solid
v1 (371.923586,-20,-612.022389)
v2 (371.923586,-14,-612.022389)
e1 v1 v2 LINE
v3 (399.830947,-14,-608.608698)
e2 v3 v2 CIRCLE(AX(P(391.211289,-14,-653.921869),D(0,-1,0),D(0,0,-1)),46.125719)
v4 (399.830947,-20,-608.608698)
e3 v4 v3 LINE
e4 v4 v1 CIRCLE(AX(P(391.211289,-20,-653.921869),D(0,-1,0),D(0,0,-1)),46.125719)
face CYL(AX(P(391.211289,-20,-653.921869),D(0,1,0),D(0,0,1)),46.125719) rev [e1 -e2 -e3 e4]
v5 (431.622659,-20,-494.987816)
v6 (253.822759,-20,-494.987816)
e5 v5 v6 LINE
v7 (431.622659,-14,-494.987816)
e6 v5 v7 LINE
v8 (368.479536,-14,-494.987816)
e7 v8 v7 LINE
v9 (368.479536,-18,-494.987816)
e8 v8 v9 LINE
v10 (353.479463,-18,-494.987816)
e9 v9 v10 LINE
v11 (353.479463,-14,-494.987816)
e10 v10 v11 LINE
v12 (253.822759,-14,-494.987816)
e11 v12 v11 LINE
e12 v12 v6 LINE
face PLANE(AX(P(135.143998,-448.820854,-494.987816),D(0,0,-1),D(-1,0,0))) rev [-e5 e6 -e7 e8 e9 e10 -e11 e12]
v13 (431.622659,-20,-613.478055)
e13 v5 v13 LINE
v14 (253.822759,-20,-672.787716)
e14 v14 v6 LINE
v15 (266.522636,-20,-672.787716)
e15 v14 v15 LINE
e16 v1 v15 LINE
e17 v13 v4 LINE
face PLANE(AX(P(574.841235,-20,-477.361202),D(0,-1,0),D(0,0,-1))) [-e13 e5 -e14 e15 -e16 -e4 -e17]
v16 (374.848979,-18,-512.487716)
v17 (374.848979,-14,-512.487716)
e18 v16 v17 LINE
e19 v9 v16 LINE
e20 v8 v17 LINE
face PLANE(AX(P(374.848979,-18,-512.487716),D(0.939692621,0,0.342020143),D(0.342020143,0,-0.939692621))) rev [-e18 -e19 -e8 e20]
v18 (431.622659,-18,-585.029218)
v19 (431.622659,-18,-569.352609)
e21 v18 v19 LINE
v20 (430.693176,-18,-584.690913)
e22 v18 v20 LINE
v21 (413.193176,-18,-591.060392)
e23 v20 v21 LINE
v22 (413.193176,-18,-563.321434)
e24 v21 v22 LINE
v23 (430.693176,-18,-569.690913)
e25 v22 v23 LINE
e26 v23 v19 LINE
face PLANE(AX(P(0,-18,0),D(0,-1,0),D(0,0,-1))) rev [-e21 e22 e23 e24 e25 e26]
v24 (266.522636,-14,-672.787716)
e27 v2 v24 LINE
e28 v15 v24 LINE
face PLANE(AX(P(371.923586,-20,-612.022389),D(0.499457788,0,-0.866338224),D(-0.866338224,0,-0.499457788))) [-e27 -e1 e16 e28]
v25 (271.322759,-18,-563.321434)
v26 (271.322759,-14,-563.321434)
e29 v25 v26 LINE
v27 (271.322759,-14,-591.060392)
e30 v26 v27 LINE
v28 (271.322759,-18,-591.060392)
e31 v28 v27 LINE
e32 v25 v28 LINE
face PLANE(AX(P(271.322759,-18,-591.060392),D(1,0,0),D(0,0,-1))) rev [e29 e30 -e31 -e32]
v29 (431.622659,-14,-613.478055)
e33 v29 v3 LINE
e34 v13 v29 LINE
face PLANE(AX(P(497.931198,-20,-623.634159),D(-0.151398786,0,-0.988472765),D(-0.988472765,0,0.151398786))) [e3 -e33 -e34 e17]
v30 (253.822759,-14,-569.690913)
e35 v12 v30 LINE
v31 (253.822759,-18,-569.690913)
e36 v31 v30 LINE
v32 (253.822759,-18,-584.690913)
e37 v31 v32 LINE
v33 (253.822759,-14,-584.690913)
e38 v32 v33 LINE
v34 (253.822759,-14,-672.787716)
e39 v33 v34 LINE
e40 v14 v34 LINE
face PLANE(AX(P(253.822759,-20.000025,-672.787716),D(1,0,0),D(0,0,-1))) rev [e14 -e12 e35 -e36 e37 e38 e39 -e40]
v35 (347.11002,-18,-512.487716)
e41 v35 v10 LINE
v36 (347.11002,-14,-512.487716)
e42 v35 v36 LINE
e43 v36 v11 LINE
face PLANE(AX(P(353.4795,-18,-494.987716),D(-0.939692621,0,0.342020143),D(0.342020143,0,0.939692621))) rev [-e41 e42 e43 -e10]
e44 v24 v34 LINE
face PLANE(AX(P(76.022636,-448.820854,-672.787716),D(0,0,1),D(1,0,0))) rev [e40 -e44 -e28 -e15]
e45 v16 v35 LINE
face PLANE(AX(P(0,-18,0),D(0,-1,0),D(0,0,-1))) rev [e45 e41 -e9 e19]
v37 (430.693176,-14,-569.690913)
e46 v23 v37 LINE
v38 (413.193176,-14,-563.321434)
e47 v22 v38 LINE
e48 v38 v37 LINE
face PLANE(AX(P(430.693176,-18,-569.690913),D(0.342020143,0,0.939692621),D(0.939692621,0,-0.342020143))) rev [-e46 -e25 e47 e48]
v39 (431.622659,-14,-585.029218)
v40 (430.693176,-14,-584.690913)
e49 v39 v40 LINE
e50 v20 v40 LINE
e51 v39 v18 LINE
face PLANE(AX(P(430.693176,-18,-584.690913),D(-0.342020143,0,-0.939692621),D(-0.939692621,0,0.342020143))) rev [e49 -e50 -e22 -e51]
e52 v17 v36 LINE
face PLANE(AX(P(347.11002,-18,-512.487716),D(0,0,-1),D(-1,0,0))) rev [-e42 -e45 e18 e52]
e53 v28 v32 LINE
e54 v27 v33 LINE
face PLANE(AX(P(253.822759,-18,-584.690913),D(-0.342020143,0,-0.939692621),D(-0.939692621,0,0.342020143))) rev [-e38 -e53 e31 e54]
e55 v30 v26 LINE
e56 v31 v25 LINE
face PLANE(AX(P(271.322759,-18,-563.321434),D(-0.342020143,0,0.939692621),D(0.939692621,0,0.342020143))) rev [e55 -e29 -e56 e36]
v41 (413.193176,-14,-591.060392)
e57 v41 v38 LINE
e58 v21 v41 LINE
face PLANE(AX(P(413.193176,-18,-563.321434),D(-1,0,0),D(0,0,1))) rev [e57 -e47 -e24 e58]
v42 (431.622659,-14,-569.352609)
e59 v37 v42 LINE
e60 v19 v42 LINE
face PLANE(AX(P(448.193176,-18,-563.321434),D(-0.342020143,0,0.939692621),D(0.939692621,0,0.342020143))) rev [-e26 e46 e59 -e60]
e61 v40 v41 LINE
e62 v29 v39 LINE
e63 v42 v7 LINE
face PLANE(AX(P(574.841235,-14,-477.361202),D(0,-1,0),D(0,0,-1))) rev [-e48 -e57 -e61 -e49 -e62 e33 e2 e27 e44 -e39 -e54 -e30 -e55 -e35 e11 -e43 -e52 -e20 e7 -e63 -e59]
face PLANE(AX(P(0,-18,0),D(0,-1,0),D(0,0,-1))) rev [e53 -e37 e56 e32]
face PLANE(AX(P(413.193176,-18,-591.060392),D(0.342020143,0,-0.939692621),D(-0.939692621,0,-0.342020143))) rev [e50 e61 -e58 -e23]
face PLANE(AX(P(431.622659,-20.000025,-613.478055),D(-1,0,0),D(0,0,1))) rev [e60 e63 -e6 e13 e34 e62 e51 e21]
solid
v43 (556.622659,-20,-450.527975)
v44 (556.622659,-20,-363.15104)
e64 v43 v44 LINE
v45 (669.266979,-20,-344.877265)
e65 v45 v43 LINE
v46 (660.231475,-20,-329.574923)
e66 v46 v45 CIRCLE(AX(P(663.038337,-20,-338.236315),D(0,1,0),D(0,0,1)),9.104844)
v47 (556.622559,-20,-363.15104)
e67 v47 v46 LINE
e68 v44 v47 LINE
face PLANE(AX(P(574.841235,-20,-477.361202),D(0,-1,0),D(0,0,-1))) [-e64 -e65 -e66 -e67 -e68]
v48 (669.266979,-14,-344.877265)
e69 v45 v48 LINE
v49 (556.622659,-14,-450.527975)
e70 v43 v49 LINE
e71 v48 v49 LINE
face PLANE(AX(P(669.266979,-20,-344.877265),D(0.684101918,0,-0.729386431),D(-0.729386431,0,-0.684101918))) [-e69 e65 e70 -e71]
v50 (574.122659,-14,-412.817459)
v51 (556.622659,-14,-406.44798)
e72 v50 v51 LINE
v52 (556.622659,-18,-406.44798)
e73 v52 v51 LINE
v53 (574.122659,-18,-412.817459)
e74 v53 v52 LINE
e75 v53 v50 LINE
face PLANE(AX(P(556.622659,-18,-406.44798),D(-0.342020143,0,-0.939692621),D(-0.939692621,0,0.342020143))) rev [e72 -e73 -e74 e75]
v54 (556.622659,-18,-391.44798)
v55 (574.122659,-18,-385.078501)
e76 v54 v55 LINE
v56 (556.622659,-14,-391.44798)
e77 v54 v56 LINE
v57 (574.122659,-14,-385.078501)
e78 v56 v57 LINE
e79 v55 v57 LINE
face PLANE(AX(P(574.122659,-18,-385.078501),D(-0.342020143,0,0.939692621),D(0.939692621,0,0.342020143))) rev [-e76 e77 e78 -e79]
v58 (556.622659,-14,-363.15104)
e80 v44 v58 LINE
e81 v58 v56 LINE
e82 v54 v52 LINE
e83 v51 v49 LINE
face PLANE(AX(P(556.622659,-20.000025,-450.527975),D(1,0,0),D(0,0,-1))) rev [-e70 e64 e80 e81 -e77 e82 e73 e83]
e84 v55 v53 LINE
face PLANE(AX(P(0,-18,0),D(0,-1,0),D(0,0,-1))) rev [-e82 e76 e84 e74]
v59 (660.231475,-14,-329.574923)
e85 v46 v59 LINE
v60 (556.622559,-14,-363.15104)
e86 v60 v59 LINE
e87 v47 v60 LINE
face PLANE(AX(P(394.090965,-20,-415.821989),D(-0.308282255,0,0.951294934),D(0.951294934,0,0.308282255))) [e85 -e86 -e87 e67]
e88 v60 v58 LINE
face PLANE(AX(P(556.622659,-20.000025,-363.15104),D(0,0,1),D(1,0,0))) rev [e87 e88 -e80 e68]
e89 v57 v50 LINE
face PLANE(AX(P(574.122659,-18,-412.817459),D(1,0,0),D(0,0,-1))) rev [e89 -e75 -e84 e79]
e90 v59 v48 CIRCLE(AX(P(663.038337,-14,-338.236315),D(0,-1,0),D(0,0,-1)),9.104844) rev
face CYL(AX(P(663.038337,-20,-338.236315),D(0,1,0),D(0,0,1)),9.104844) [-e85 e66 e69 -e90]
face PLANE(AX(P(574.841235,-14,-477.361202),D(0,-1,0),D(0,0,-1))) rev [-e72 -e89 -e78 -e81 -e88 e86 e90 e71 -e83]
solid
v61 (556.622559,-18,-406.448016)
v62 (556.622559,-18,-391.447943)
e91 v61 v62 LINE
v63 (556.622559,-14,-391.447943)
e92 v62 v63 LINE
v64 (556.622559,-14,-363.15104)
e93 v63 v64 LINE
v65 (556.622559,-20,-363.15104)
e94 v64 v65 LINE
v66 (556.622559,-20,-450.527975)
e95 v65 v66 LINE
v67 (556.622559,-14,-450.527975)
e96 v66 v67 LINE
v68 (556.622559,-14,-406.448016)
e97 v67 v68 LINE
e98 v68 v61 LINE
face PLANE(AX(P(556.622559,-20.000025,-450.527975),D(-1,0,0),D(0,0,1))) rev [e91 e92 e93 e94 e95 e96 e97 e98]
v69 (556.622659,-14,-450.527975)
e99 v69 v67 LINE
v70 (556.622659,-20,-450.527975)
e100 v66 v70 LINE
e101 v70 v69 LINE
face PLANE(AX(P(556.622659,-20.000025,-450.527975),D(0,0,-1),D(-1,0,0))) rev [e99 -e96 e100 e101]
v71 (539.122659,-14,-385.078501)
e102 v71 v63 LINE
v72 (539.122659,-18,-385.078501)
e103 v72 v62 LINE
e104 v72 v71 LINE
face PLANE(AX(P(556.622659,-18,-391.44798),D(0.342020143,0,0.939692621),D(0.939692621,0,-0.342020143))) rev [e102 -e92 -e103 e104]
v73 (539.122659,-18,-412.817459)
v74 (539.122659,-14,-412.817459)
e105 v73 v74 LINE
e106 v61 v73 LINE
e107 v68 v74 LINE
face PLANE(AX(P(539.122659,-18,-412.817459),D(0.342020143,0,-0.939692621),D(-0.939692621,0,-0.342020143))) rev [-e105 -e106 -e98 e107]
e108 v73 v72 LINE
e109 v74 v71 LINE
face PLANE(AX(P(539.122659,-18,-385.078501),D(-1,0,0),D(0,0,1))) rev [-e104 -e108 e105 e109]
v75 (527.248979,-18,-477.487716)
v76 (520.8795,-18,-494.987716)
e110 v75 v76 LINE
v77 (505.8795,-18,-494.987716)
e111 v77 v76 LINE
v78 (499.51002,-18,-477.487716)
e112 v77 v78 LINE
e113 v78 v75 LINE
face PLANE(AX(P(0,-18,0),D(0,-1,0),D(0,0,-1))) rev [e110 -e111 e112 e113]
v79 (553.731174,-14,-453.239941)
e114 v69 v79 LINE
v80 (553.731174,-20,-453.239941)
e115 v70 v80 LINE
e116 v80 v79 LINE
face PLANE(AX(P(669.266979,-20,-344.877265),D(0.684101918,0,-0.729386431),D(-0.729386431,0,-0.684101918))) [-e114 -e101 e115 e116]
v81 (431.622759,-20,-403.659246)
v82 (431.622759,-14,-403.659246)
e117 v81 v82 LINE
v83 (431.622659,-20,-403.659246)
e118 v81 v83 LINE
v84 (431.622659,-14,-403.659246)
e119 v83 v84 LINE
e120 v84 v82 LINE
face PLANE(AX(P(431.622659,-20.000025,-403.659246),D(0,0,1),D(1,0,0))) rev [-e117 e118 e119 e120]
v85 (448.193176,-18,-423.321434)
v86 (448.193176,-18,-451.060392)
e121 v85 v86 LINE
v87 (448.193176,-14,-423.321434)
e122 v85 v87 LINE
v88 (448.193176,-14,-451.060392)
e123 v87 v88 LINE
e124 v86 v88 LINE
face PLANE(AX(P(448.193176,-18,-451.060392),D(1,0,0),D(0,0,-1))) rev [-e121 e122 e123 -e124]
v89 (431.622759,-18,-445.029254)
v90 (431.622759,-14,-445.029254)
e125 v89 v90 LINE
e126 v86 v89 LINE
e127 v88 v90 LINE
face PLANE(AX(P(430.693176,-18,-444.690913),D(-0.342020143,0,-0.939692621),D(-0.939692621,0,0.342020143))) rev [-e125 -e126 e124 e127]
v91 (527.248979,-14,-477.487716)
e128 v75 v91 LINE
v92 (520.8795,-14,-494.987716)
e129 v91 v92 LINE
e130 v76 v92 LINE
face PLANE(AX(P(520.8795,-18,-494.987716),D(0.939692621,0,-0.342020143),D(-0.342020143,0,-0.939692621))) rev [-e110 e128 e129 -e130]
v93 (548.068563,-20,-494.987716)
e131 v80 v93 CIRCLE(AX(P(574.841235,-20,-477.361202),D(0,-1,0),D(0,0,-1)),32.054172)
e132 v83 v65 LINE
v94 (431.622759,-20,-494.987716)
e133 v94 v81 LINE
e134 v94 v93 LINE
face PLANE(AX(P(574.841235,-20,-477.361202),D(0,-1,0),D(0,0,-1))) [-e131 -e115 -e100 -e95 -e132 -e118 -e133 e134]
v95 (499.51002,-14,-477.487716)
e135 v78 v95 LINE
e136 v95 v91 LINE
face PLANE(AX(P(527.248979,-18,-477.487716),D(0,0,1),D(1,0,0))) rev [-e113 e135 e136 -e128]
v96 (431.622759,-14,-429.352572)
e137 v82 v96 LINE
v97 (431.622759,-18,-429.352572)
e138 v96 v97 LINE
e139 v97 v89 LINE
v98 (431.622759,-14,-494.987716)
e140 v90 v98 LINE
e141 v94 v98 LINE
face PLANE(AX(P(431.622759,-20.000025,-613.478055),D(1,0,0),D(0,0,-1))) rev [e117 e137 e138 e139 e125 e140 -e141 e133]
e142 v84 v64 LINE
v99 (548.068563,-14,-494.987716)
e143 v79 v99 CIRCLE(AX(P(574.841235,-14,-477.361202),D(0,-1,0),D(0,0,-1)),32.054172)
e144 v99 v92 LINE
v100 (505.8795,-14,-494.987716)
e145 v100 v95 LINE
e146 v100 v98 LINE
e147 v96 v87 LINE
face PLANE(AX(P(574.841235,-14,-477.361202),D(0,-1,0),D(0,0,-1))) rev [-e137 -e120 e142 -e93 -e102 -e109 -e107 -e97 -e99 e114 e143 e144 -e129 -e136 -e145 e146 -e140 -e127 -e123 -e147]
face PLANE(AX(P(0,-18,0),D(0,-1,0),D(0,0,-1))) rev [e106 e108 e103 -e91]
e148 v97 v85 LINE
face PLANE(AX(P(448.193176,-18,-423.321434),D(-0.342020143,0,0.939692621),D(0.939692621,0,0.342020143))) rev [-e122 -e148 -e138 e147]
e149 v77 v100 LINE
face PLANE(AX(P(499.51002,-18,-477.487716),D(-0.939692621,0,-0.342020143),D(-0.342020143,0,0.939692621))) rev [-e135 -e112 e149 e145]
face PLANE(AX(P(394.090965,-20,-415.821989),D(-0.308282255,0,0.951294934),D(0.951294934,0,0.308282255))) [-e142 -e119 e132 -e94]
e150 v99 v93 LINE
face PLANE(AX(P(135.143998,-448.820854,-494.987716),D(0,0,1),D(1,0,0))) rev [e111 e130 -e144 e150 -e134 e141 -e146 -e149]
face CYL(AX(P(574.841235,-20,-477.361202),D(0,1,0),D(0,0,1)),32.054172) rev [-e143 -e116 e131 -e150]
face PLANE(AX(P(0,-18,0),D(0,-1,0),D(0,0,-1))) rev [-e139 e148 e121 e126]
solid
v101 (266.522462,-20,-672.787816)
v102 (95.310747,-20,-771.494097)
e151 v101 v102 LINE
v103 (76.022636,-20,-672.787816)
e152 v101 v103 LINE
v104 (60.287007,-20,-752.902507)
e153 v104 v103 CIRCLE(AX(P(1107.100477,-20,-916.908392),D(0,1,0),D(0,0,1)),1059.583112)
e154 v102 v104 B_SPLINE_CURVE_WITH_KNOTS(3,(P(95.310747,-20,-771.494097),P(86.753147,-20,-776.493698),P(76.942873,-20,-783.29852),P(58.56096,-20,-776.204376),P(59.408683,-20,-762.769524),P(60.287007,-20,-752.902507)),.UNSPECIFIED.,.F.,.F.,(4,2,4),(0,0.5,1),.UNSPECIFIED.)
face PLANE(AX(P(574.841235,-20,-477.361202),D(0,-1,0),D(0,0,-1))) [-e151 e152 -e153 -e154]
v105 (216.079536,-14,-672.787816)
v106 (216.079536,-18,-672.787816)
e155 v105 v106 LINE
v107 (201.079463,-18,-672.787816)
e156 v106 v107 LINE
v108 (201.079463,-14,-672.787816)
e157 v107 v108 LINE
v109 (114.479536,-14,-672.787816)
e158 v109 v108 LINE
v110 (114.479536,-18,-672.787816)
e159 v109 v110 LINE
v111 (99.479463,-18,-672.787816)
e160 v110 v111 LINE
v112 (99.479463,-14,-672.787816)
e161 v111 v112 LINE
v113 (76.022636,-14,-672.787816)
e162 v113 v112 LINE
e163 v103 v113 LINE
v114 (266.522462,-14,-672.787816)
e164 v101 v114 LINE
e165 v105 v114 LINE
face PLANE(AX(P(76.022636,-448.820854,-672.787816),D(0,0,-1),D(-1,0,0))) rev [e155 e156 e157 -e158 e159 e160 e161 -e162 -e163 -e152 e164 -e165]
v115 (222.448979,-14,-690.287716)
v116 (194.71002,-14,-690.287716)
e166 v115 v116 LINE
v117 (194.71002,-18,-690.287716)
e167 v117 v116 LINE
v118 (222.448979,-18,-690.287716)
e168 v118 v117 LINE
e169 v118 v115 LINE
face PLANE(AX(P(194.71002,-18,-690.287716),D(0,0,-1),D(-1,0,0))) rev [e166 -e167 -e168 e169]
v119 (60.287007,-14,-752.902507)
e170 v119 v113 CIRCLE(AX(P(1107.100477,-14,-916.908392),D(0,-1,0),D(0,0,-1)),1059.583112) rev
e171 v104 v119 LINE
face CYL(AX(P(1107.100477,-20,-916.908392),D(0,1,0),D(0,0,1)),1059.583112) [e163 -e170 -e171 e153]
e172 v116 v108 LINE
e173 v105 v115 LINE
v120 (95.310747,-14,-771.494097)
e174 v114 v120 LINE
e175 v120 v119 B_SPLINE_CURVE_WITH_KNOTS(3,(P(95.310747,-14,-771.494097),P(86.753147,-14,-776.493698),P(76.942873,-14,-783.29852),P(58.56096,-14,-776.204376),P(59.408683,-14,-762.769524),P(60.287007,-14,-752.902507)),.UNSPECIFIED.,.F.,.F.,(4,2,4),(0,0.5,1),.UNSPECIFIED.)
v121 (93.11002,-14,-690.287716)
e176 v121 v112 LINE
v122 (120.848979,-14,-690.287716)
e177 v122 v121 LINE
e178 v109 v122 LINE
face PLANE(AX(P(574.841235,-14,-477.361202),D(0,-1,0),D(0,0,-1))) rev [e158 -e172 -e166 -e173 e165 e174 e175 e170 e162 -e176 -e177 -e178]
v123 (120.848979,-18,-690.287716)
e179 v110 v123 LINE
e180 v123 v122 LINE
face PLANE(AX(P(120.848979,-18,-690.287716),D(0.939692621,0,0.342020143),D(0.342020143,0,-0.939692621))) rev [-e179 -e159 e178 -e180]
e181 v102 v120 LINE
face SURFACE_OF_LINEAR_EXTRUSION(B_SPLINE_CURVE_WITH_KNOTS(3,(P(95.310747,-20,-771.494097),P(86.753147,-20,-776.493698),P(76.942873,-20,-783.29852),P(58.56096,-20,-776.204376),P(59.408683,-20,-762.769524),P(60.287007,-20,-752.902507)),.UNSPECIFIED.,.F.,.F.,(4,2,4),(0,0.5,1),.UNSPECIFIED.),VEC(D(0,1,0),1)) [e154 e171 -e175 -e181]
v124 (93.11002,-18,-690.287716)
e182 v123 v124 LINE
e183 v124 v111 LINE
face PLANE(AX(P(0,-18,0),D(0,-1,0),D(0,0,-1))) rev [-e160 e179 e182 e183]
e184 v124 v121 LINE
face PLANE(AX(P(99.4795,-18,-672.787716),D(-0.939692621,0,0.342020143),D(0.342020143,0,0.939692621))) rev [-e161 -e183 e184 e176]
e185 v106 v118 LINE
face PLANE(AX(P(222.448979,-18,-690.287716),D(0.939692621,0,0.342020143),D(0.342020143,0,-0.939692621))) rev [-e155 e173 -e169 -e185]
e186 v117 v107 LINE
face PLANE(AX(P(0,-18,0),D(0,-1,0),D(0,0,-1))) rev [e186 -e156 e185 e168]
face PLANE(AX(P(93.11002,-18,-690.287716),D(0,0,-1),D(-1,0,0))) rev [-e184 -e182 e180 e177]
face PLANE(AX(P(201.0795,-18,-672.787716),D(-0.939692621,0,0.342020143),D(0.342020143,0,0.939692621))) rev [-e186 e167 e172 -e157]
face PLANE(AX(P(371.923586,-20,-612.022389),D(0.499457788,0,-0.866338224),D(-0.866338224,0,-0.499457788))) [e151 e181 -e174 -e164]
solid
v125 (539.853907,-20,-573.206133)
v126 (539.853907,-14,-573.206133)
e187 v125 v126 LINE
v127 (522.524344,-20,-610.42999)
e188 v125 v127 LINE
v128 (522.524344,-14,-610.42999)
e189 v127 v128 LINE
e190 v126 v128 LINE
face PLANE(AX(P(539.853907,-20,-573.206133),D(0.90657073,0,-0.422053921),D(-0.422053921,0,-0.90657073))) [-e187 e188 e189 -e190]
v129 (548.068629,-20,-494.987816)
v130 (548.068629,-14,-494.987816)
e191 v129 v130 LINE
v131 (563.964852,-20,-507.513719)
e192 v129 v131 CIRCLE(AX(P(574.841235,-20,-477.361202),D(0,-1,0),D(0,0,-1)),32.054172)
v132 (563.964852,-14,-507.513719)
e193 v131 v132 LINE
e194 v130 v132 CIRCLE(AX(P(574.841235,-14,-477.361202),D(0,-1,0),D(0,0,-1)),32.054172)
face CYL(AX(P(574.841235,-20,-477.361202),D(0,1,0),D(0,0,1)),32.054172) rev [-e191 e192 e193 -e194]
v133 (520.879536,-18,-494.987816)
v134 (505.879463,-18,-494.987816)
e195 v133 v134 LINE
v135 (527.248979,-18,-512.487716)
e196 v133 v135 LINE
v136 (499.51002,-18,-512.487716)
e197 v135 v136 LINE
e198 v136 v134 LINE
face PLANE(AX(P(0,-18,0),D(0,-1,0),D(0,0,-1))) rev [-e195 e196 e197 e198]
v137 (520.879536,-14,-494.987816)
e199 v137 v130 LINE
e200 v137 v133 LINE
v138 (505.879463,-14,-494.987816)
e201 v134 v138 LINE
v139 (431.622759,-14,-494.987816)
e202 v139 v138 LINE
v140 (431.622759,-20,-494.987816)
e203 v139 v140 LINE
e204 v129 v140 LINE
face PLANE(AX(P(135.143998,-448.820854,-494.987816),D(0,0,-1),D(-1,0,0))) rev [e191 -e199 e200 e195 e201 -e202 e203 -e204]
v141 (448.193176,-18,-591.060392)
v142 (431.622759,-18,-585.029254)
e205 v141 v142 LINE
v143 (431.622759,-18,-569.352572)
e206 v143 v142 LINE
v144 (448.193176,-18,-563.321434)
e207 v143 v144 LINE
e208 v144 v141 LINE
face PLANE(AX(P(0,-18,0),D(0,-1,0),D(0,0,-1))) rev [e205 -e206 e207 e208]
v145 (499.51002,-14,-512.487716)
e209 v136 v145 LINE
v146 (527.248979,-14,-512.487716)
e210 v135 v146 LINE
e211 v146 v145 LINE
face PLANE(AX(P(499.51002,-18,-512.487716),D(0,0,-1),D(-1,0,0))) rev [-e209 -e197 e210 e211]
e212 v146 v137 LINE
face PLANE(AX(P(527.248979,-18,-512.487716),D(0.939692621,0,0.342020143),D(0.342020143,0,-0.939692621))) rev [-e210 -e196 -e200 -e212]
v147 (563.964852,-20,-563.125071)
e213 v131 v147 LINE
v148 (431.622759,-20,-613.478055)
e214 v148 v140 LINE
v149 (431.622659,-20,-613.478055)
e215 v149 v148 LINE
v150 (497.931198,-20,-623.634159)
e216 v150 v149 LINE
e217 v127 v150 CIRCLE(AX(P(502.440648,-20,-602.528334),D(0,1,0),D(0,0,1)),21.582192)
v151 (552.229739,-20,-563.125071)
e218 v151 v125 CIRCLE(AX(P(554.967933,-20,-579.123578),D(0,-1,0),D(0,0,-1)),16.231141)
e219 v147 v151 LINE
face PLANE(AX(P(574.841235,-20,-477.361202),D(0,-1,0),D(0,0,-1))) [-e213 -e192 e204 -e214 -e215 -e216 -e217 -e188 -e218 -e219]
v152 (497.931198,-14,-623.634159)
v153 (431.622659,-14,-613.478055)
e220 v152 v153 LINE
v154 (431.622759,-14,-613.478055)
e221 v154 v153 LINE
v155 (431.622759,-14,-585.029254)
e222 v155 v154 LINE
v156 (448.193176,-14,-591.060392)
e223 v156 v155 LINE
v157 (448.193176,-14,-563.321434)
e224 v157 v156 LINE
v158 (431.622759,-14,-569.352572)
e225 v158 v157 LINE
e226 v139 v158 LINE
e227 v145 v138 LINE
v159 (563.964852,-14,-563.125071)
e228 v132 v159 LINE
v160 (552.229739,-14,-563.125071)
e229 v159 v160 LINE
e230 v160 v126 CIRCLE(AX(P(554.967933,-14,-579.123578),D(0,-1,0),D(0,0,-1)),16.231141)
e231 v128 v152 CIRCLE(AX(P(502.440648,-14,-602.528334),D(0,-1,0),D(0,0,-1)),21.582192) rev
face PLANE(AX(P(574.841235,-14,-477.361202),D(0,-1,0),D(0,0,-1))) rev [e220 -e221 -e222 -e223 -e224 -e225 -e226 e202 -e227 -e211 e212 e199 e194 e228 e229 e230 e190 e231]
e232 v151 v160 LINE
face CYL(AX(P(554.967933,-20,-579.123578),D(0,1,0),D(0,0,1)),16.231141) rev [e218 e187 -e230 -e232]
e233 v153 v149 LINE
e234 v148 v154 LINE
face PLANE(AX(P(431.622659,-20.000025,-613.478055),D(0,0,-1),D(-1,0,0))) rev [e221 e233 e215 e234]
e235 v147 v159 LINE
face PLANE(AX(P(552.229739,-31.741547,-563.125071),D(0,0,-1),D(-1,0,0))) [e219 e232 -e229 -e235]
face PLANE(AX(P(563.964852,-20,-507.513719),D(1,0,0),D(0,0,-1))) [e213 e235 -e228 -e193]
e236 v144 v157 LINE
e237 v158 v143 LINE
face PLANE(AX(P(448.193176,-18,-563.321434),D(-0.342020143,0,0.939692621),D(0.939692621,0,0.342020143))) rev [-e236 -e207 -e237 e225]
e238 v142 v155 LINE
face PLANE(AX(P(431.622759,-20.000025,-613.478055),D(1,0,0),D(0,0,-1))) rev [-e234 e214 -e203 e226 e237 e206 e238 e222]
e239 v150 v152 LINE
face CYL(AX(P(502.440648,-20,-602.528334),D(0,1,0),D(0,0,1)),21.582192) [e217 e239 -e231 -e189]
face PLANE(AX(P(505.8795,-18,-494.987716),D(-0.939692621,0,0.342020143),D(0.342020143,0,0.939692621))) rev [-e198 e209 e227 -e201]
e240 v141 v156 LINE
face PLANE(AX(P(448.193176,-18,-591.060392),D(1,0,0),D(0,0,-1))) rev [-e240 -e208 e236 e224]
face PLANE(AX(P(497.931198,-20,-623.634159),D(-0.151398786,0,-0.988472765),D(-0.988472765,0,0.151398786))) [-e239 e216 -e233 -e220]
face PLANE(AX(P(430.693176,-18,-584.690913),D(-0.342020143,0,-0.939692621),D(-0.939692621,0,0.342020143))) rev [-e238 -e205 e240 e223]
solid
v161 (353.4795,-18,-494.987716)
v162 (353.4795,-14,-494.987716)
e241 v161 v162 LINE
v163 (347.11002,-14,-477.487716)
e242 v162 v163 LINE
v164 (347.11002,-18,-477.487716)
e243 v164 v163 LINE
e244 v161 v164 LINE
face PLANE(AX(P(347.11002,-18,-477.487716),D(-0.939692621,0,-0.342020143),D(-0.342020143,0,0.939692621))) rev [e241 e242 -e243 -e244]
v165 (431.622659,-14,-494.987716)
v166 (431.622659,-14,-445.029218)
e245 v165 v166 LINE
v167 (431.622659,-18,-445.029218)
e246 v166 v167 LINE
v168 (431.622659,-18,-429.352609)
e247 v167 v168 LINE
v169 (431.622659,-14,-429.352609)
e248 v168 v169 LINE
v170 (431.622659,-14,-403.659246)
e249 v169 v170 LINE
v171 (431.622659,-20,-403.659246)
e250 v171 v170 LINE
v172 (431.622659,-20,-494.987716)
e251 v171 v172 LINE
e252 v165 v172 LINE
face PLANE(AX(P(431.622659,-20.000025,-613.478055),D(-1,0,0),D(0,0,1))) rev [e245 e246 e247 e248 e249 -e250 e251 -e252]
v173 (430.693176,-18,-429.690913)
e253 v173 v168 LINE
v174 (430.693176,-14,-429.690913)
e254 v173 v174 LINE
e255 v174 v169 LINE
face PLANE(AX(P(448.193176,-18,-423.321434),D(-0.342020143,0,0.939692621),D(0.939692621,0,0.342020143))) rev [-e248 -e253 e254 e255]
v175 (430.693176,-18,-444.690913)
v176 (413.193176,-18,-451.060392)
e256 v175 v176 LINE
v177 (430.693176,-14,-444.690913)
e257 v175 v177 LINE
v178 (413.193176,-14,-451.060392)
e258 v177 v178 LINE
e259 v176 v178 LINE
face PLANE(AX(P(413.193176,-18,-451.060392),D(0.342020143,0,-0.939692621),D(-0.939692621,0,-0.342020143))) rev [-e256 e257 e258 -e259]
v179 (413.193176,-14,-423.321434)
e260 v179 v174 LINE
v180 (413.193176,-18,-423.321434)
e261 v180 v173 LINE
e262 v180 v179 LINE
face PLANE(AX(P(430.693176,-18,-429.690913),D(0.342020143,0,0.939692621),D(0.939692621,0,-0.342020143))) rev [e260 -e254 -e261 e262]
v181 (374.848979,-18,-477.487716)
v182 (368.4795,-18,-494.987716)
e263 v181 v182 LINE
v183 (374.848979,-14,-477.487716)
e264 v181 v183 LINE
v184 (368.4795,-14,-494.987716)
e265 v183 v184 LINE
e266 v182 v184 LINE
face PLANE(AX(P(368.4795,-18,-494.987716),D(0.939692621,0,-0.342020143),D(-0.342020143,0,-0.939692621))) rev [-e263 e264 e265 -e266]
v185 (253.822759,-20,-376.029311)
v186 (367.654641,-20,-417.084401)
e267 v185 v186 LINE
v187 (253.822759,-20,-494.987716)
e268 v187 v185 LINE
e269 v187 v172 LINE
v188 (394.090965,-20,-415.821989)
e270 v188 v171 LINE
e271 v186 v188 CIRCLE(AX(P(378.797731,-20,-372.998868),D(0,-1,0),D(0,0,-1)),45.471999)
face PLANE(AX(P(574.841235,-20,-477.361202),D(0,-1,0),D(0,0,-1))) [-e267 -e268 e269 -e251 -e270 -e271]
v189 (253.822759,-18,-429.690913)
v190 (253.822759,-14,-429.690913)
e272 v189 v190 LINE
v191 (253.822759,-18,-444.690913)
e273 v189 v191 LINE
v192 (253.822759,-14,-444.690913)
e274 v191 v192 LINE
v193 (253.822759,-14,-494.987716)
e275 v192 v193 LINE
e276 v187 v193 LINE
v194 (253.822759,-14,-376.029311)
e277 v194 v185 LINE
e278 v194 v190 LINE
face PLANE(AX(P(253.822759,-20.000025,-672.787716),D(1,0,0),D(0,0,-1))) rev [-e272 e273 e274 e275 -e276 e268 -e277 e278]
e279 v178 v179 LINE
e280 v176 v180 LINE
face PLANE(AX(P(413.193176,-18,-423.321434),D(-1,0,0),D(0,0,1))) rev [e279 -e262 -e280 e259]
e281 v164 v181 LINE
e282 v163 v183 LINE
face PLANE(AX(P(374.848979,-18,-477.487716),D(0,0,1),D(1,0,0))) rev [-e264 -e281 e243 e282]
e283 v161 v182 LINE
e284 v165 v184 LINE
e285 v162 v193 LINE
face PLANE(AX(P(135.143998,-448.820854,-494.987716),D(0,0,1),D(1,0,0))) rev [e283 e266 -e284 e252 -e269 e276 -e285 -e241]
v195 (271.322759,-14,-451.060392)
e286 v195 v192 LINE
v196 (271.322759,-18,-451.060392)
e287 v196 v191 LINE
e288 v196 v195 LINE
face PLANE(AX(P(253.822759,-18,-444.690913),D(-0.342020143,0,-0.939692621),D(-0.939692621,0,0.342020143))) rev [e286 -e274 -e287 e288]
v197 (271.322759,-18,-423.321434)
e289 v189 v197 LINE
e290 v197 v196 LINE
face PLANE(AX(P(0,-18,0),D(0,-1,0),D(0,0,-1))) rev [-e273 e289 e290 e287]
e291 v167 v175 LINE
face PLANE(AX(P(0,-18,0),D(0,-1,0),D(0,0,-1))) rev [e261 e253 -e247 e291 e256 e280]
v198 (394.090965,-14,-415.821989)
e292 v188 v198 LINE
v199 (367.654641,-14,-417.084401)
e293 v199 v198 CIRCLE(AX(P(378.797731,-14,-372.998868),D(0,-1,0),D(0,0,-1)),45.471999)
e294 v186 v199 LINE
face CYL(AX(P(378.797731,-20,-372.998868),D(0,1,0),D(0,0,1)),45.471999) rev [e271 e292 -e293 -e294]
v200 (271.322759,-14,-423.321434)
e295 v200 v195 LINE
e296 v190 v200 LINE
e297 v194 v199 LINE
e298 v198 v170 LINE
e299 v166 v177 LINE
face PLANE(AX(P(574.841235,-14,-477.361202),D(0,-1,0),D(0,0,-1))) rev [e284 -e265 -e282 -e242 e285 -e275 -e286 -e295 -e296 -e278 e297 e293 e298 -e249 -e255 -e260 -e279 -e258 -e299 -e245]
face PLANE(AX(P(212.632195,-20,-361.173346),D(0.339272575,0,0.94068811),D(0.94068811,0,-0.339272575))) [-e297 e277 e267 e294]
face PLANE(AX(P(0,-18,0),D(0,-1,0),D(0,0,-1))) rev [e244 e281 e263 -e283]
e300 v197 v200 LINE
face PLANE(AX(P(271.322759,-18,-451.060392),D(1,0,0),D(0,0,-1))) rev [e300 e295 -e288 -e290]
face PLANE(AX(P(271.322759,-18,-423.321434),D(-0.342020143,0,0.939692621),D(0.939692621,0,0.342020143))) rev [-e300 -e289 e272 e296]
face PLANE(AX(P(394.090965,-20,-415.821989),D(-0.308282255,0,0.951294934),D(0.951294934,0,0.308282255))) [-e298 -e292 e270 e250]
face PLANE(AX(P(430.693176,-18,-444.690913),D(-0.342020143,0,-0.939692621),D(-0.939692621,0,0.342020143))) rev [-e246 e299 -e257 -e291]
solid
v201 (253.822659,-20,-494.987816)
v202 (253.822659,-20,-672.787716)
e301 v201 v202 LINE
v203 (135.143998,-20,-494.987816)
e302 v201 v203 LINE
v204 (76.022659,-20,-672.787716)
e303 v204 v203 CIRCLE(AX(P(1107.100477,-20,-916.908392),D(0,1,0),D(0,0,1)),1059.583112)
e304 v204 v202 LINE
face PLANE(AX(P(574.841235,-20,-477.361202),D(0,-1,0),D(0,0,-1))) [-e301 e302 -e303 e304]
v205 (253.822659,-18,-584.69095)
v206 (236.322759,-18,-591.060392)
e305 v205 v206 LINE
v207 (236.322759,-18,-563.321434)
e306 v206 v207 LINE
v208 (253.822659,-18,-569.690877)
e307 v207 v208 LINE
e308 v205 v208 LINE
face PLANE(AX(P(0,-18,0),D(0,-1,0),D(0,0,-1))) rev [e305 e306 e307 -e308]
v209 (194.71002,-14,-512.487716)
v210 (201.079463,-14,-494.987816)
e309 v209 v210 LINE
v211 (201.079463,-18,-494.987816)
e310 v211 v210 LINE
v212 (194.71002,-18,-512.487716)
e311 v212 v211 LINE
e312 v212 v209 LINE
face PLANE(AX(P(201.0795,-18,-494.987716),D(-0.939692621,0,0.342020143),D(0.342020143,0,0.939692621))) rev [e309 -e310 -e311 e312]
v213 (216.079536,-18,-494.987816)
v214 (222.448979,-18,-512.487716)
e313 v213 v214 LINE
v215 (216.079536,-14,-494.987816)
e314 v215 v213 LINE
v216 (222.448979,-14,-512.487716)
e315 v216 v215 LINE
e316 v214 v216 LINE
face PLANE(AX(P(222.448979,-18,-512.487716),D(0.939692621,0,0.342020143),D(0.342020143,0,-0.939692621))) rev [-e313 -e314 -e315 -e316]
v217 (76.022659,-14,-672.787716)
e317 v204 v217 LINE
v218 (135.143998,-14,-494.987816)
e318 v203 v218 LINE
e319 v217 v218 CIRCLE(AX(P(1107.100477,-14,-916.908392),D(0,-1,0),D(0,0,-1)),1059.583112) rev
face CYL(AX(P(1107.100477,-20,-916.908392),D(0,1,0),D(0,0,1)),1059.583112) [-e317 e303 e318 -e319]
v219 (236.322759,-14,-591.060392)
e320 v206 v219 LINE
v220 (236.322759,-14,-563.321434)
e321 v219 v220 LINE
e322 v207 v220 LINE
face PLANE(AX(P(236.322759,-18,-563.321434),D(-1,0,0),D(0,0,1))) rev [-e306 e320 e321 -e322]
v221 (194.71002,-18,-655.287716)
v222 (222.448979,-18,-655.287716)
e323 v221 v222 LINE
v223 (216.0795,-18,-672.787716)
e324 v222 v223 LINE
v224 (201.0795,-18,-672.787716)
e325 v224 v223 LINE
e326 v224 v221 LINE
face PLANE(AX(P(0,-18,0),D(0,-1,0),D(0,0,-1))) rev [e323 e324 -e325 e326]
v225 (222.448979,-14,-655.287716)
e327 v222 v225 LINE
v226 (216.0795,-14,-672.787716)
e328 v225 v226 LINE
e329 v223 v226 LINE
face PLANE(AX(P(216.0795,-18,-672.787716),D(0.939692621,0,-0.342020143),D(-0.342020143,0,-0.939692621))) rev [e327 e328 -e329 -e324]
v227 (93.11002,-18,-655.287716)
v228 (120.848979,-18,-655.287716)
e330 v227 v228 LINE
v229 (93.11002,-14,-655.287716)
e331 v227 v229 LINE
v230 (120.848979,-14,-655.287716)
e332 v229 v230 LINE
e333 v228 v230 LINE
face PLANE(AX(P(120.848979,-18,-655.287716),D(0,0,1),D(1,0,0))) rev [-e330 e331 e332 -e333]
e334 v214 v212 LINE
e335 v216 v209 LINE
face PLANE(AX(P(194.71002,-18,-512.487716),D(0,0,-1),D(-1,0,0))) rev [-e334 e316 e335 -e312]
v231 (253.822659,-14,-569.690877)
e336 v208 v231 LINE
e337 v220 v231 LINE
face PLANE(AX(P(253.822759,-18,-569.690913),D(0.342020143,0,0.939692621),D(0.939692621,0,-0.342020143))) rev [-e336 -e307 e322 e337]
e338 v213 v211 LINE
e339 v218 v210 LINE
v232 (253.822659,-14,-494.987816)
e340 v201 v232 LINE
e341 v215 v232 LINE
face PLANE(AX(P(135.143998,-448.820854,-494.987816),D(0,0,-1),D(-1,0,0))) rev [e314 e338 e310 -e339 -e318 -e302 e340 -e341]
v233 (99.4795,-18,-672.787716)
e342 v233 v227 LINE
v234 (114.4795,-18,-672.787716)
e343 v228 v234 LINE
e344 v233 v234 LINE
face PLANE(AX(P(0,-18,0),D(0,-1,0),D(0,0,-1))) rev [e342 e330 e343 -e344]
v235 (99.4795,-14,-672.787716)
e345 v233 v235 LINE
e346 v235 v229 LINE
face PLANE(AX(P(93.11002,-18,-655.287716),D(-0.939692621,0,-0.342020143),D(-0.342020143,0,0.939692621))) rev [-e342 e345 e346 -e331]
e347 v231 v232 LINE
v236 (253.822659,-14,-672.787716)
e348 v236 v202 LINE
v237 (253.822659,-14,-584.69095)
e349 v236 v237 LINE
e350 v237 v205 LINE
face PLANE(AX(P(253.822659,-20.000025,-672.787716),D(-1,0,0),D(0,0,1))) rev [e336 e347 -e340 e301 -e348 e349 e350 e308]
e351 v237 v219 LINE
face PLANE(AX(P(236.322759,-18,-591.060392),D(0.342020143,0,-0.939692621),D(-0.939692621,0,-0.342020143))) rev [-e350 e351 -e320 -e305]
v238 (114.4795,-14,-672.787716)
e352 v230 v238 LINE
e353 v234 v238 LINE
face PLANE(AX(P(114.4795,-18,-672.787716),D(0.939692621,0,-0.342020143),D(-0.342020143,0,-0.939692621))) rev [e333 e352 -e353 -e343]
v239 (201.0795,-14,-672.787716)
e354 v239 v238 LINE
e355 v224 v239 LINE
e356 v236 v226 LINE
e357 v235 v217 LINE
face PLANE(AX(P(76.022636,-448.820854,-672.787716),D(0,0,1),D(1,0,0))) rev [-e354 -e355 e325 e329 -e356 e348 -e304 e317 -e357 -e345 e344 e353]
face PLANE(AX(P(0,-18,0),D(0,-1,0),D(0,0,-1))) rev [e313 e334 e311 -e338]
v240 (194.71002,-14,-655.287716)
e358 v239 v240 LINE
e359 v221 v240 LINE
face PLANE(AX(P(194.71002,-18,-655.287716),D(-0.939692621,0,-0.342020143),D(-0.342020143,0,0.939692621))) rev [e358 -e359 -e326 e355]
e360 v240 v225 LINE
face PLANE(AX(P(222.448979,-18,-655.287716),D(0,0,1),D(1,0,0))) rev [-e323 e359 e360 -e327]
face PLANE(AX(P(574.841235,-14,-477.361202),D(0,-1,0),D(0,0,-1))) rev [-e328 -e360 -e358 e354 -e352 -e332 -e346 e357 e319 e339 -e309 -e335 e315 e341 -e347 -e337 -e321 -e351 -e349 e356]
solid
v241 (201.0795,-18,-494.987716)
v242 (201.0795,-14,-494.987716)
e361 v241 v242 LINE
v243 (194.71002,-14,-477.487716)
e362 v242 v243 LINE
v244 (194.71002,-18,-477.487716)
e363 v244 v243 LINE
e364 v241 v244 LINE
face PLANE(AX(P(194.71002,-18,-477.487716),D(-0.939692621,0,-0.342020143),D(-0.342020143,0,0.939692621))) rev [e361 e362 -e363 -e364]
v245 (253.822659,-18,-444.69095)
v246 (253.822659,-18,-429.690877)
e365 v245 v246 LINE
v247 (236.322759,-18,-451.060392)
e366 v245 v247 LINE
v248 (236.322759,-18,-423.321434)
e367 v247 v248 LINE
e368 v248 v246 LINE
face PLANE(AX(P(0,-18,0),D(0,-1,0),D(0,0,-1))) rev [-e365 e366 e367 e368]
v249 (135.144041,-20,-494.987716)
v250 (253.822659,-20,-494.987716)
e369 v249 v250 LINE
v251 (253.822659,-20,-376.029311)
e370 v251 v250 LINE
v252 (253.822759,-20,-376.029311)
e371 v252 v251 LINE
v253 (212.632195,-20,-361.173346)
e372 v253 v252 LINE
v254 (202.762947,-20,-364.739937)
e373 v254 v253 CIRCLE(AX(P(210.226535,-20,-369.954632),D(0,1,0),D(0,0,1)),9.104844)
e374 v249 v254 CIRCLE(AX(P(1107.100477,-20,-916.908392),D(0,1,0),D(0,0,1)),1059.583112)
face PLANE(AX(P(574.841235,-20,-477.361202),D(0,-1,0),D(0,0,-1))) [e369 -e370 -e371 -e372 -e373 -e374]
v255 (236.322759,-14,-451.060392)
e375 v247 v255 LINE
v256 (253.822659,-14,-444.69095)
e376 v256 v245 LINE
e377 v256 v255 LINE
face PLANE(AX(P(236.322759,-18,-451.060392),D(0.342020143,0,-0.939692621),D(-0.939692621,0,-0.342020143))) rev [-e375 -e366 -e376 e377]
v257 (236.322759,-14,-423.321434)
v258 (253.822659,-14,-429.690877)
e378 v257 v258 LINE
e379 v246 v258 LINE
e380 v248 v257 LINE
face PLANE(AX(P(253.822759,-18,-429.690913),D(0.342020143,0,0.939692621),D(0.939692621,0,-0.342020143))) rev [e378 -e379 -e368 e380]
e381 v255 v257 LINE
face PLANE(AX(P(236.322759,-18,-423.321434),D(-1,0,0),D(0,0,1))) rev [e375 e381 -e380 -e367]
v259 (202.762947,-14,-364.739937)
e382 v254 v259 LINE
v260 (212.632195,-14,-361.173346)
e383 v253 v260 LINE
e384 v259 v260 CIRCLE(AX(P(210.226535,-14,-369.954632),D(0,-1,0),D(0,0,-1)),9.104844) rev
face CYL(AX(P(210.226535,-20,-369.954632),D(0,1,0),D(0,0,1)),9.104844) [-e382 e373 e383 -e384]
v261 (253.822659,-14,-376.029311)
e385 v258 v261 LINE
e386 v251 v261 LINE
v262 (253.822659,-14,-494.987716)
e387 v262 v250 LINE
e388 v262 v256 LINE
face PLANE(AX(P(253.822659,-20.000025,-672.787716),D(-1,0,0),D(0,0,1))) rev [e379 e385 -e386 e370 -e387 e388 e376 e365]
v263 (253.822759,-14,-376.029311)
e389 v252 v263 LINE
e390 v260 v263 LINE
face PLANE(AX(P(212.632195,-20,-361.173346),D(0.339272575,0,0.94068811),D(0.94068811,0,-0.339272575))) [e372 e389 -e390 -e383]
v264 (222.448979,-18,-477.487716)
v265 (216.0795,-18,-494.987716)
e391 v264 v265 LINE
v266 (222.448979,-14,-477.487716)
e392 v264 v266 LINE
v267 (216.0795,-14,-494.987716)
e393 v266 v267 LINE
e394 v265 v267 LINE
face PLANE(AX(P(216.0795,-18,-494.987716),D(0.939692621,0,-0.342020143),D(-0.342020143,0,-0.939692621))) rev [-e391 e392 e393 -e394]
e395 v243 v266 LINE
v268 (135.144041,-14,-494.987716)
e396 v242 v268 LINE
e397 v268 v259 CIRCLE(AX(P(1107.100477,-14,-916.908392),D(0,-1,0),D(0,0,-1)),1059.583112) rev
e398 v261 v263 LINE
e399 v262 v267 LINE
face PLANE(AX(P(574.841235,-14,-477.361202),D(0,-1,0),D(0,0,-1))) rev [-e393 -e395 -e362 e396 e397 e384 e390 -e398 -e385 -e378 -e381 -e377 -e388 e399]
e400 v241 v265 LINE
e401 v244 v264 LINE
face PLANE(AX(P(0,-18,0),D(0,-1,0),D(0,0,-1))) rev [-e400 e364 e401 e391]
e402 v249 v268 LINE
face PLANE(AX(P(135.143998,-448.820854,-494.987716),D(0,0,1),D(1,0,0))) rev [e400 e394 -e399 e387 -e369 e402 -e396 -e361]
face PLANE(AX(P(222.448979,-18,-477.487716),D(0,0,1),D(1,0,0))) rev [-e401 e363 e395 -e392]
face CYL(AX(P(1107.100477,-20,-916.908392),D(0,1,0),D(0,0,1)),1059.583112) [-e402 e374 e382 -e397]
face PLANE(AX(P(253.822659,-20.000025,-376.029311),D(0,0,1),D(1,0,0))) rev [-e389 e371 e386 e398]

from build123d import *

# Parameters (mm, degrees)
BOSS_EXTRUDE1_DEPTH            = 40
F_13_0_13_DIAMETER_HOLE1_D     = 13
F_13_0_13_DIAMETER_HOLE1_DEPTH = 29
CUT_EXTRUDE8_DEPTH             = 16
SKETCH14_R                     = 6.35
SKETCH14_R_2                   = 5.502637429
CUT_EXTRUDE9_DEPTH             = 10
CUT_EXTRUDE10_DEPTH            = 10
BOSS_EXTRUDE2_DEPTH            = 24
BOSS_EXTRUDE3_START            = -40
BOSS_EXTRUDE3_DEPTH            = 40
CUT_EXTRUDE11_DEPTH            = 34
CUT_EXTRUDE12_START            = -672.787815527
CUT_EXTRUDE12_OUTLINE_W        = 473
CUT_EXTRUDE12_OUTLINE_H        = 6
CUT_EXTRUDE12_DEPTH            = 0.0001
CUT_EXTRUDE12_START_2          = -494.987815527
CUT_EXTRUDE12_2_OUTLINE_W      = 473
CUT_EXTRUDE12_2_OUTLINE_H      = 6
CUT_EXTRUDE12_2_DEPTH          = 0.0001
CUT_EXTRUDE13_START            = 253.822659289
CUT_EXTRUDE13_OUTLINE_W        = 6
CUT_EXTRUDE13_OUTLINE_H        = 27.629935764
CUT_EXTRUDE13_OUTLINE_H_2      = 46.868729155
CUT_EXTRUDE13_OUTLINE_H_3      = 44.459740095
CUT_EXTRUDE13_DEPTH            = 0.0001
CUT_EXTRUDE13_START_2          = 431.622659289
CUT_EXTRUDE13_2_OUTLINE_W      = 6
CUT_EXTRUDE13_2_OUTLINE_H      = 46.868729155
CUT_EXTRUDE13_2_OUTLINE_H_2    = 44.459740095
CUT_EXTRUDE13_2_DEPTH          = 0.0001
CUT_EXTRUDE13_START_3          = 556.622559289
CUT_EXTRUDE13_3_OUTLINE_W      = 6
CUT_EXTRUDE13_3_OUTLINE_H      = 87.376935067
CUT_EXTRUDE13_3_DEPTH          = 0.0001
CUT_EXTRUDE14_DEPTH            = 4


# Read off the part's stored shape, not the designer's step: Cut-Extrude12, Cut-Extrude13
with BuildPart() as part:
    # Sketch1 → Boss-Extrude1 (new body)
    with BuildSketch(Plane(origin=(0, 20, 0), x_dir=(1, 0, 0), z_dir=(0, 1, 0))):
        with BuildLine():
            Line((563.96485174, 507.513718698), (563.96485174, 562.736423486))
            Line((563.96485174, 562.736423486), (554.690781869, 562.894803628))
            ThreePointArc((554.690781869, 562.894803628), (545.704943994, 565.795150829), (539.853906856, 573.206133263))
            Line((539.853906856, 573.206133263), (522.524343645, 610.429990226))
            ThreePointArc((522.524343645, 610.429990226), (512.649800976, 621.543175495), (497.931198247, 623.634159339))
            Line((497.931198247, 623.634159339), (399.830947056, 608.608698386))
            ThreePointArc((399.830947056, 608.608698386), (385.610832142, 608.137408426), (371.923585817, 612.02238853))
            Line((371.923585817, 612.02238853), (95.310746964, 771.494097008))
            add(Edge.make_bspline(
                [(60.287007155, 752.902507236), (59.408683029, 762.769524202), (58.560960325, 776.204376236), (76.94287295, 783.298520304), (86.753146937, 776.493697586), (95.310746964, 771.494097008)],
                knots=[0, 0, 0, 0, 0.5, 0.5, 1, 1, 1, 1], degree=3))
            ThreePointArc((60.287007155, 752.902507236), (112.407005996, 551.803928099), (202.762947005, 364.739937083))
            ThreePointArc((202.762947005, 364.739937083), (207.132055784, 361.391783138), (212.632195034, 361.173346422))
            Line((212.632195034, 361.173346422), (367.65464082, 417.084401042))
            ThreePointArc((367.65464082, 417.084401042), (380.966681082, 418.419109504), (394.090964942, 415.82198883))
            Line((394.090964942, 415.82198883), (660.231475403, 329.574923038))
            ThreePointArc((660.231475403, 329.574923038), (670.878462163, 333.606992627), (669.266978502, 344.877264703))
            Line((669.266978502, 344.877264703), (553.73117364, 453.239940989))
            ThreePointArc((553.73117364, 453.239940989), (543.342125743, 483.300566911), (563.96485174, 507.513718698))
        make_face()
    extrude(amount=-BOSS_EXTRUDE1_DEPTH)

    # Ø13.0 (13) Diameter Hole1
    with Locations(Plane(origin=(0, 20, 0), x_dir=(1, 0, 0), z_dir=(0, 1, 0))):
        with Locations((274.335910331, 496.233480955), (274.335910331, 579.213058938)):
            Hole(F_13_0_13_DIAMETER_HOLE1_D / 2, depth=F_13_0_13_DIAMETER_HOLE1_DEPTH)

    # Sketch13 → Cut-Extrude8 (cut)
    with BuildSketch(Plane(origin=(0, 20, 0), x_dir=(1, 0, 0), z_dir=(0, 1, 0))):
        with BuildLine():
            Line((563.96485174, 563.125071092), (496.273234513, 563.125071092))
            ThreePointArc((496.273234513, 563.125071092), (492.20587406, 561.651450789), (490.026307291, 557.914544776))
            ThreePointArc((490.026307291, 557.914544776), (487.96485174, 535.125071092), (490.026307291, 512.335597408))
            ThreePointArc((490.026307291, 512.335597408), (492.20587406, 508.598691395), (496.273234513, 507.125071092))
            Line((496.273234513, 507.125071092), (563.96485174, 507.125071092))
            Line((563.96485174, 507.125071092), (563.96485174, 563.125071092))
        make_face()
    extrude(amount=-CUT_EXTRUDE8_DEPTH, mode=Mode.SUBTRACT)

    # Sketch14 → Cut-Extrude9 (cut)
    with BuildSketch(Plane(origin=(0, 20, 0), x_dir=(1, 0, 0), z_dir=(0, 1, 0))):
        with Locations(Location((303.81485174, 498.131405852, 0), (0, 0, 270))):
            Circle(SKETCH14_R)
        with Locations(Location((298.641153596, 572.118736332, 0), (0, 0, 270))):
            Circle(SKETCH14_R_2)
    extrude(amount=-CUT_EXTRUDE9_DEPTH, mode=Mode.SUBTRACT)

    # Sketch17 → Cut-Extrude10 (cut)
    with BuildSketch(Plane(origin=(0, 20, 0), x_dir=(1, 0, 0), z_dir=(0, 1, 0))):
        with BuildLine():
            Line((481.61485174, 499.042173829), (481.61485174, 571.207968354))
            ThreePointArc((481.61485174, 571.207968354), (473.296544122, 580.314612527), (463.475969831, 572.852606745))
            Line((463.475969831, 572.852606745), (457.73885174, 541.475071092))
            Line((457.73885174, 541.475071092), (457.73885174, 528.775071092))
            Line((457.73885174, 528.775071092), (463.475969831, 497.397535439))
            ThreePointArc((463.475969831, 497.397535439), (473.296544122, 489.935529657), (481.61485174, 499.042173829))
        make_face()
        with BuildLine():
            Line((420.65485174, 499.042173829), (420.65485174, 571.207968354))
            ThreePointArc((420.65485174, 571.207968354), (412.336544122, 580.314612527), (402.515969831, 572.852606745))
            Line((402.515969831, 572.852606745), (396.77885174, 541.475071092))
            Line((396.77885174, 541.475071092), (396.77885174, 528.775071092))
            Line((396.77885174, 528.775071092), (402.515969831, 497.397535439))
            ThreePointArc((402.515969831, 497.397535439), (412.336544122, 489.935529657), (420.65485174, 499.042173829))
        make_face()
        with BuildLine():
            Line((357.072977222, 497.929527206), (372.077089581, 568.518325976))
            ThreePointArc((372.077089581, 568.518325976), (365.83393473, 579.155441526), (354.67652531, 573.898310679))
            Line((354.67652531, 573.898310679), (342.541020523, 544.399263386))
            Line((342.541020523, 544.399263386), (339.90054205, 531.976788856))
            Line((339.90054205, 531.976788856), (338.988533854, 500.092113718))
            ThreePointArc((338.988533854, 500.092113718), (347.043066796, 490.751358459), (357.072977222, 497.929527206))
        make_face()
    extrude(amount=-CUT_EXTRUDE10_DEPTH, mode=Mode.SUBTRACT)

    # Sketch19 → Boss-Extrude2 (add)
    with BuildSketch(Plane(origin=(0, 4, 0), x_dir=(1, 0, 0), z_dir=(0, 1, 0))):
        with BuildLine():
            Line((552.229738554, 563.125071092), (563.96485174, 563.125071092))
            Line((563.96485174, 563.125071092), (563.96485174, 562.736423486))
            Line((563.96485174, 562.736423486), (554.690781869, 562.894803628))
            ThreePointArc((554.690781869, 562.894803628), (553.455870496, 562.963021133), (552.229738554, 563.125071092))
        make_face()
    extrude(amount=-BOSS_EXTRUDE2_DEPTH)

    # Sketch20 → Boss-Extrude3 (add)
    with BuildSketch(Plane.XZ.offset(20).offset(BOSS_EXTRUDE3_START)):
        with BuildLine():
            Line((553.73117364, -453.239940989), (669.266978502, -344.877264703))
            ThreePointArc((669.266978502, -344.877264703), (670.878462163, -333.606992627), (660.231475403, -329.574923038))
            Line((660.231475403, -329.574923038), (394.090964942, -415.82198883))
            ThreePointArc((394.090964942, -415.82198883), (380.966681082, -418.419109504), (367.65464082, -417.084401042))
            Line((367.65464082, -417.084401042), (212.632195034, -361.173346422))
            ThreePointArc((212.632195034, -361.173346422), (207.132055784, -361.391783138), (202.762947005, -364.739937083))
            ThreePointArc((202.762947005, -364.739937083), (112.407005996, -551.803928099), (60.287007155, -752.902507236))
            add(Edge.make_bspline(
                [(60.287007155, -752.902507236), (59.408683029, -762.769524202), (58.560960325, -776.204376236), (76.94287295, -783.298520304), (86.753146937, -776.493697586), (95.310746964, -771.494097008)],
                knots=[0, 0, 0, 0, 0.5, 0.5, 1, 1, 1, 1], degree=3))
            Line((95.310746964, -771.494097008), (371.923585817, -612.02238853))
            ThreePointArc((371.923585817, -612.02238853), (385.610832142, -608.137408426), (399.830947056, -608.608698386))
            Line((399.830947056, -608.608698386), (497.931198247, -623.634159339))
            ThreePointArc((497.931198247, -623.634159339), (512.649800976, -621.543175495), (522.524343645, -610.429990226))
            Line((522.524343645, -610.429990226), (539.853906856, -573.206133263))
            ThreePointArc((539.853906856, -573.206133263), (544.716962334, -566.539161561), (552.229738554, -563.125071092))
            Line((552.229738554, -563.125071092), (563.96485174, -563.125071092))
            Line((563.96485174, -563.125071092), (563.96485174, -507.513718698))
            ThreePointArc((563.96485174, -507.513718698), (543.342125743, -483.300566911), (553.73117364, -453.239940989))
        make_face()
    extrude(amount=BOSS_EXTRUDE3_DEPTH)

    # Sketch21 → Cut-Extrude11 (cut)
    with BuildSketch(Plane(origin=(0, 20, 0), x_dir=(1, 0, 0), z_dir=(0, 1, 0))):
        with BuildLine():
            Line((563.96485174, 507.513718698), (563.96485174, 563.125071092))
            Line((563.96485174, 563.125071092), (552.229738554, 563.125071092))
            ThreePointArc((552.229738554, 563.125071092), (544.716962334, 566.539161561), (539.853906856, 573.206133263))
            Line((539.853906856, 573.206133263), (522.524343645, 610.429990226))
            ThreePointArc((522.524343645, 610.429990226), (512.649800976, 621.543175495), (497.931198247, 623.634159339))
            Line((497.931198247, 623.634159339), (399.830947056, 608.608698386))
            ThreePointArc((399.830947056, 608.608698386), (385.610832142, 608.137408426), (371.923585817, 612.02238853))
            Line((371.923585817, 612.02238853), (95.310746964, 771.494097008))
            add(Edge.make_bspline(
                [(95.310746964, 771.494097008), (86.753146937, 776.493697586), (76.94287295, 783.298520304), (58.560960325, 776.204376236), (59.408683029, 762.769524202), (60.287007155, 752.902507236)],
                knots=[0, 0, 0, 0, 0.5, 0.5, 1, 1, 1, 1], degree=3))
            ThreePointArc((60.287007155, 752.902507236), (112.407005996, 551.803928099), (202.762947005, 364.739937083))
            ThreePointArc((202.762947005, 364.739937083), (207.132055784, 361.391783138), (212.632195034, 361.173346422))
            Line((212.632195034, 361.173346422), (367.65464082, 417.084401042))
            ThreePointArc((367.65464082, 417.084401042), (380.966681082, 418.419109504), (394.090964942, 415.82198883))
            Line((394.090964942, 415.82198883), (660.231475403, 329.574923038))
            ThreePointArc((660.231475403, 329.574923038), (670.878462163, 333.606992627), (669.266978502, 344.877264703))
            Line((669.266978502, 344.877264703), (553.73117364, 453.239940989))
            ThreePointArc((553.73117364, 453.239940989), (543.342125743, 483.300566911), (563.96485174, 507.513718698))
        make_face()
    extrude(amount=-CUT_EXTRUDE11_DEPTH, mode=Mode.SUBTRACT)

    # Cut-Extrude12 outline → Cut-Extrude12 (cut)
    with BuildSketch(Plane.XY.offset(CUT_EXTRUDE12_START)):
        with Locations((312.5, -17)):
            Rectangle(CUT_EXTRUDE12_OUTLINE_W, CUT_EXTRUDE12_OUTLINE_H)
    extrude(amount=CUT_EXTRUDE12_DEPTH, mode=Mode.SUBTRACT)

    # Cut-Extrude12 2 outline → Cut-Extrude12 2 (cut)
    with BuildSketch(Plane.XY.offset(CUT_EXTRUDE12_START_2)):
        with Locations((312.5, -17)):
            Rectangle(CUT_EXTRUDE12_2_OUTLINE_W, CUT_EXTRUDE12_2_OUTLINE_H)
    extrude(amount=CUT_EXTRUDE12_2_DEPTH, mode=Mode.SUBTRACT)

    # Cut-Extrude13 outline → Cut-Extrude13 (cut)
    with BuildSketch(Plane.YZ.offset(CUT_EXTRUDE13_START)):
        with Locations((-17, -389.844278395)):
            Rectangle(CUT_EXTRUDE13_OUTLINE_W, CUT_EXTRUDE13_OUTLINE_H)
        with Locations((-17, -427.093610855)):
            Rectangle(CUT_EXTRUDE13_OUTLINE_W, CUT_EXTRUDE13_OUTLINE_H_2)
        with Locations((-17, -472.75784548)):
            Rectangle(CUT_EXTRUDE13_OUTLINE_W, CUT_EXTRUDE13_OUTLINE_H_3)
        Polygon((-14, -613.478055243), (-14, -494.987815527), (-20, -494.987715527), (-20, -613.478055243), align=None)
        Polygon((-14, -624.110525751), (-14, -613.478055243), (-20, -613.478055243), (-20, -624.110525751), (-20, -672.787715527), (-14, -672.787715527), align=None)
    extrude(amount=CUT_EXTRUDE13_DEPTH, mode=Mode.SUBTRACT)

    # Cut-Extrude13 2 outline → Cut-Extrude13 2 (cut)
    with BuildSketch(Plane.YZ.offset(CUT_EXTRUDE13_START_2)):
        with Locations((-17, -427.093610855)):
            Rectangle(CUT_EXTRUDE13_2_OUTLINE_W, CUT_EXTRUDE13_2_OUTLINE_H)
        with Locations((-17, -472.75784548)):
            Rectangle(CUT_EXTRUDE13_2_OUTLINE_W, CUT_EXTRUDE13_2_OUTLINE_H_2)
        Polygon((-14, -613.478055243), (-14, -494.987815527), (-20, -494.987715527), (-20, -613.478055243), align=None)
    extrude(amount=CUT_EXTRUDE13_2_DEPTH, mode=Mode.SUBTRACT)

    # Cut-Extrude13 3 outline → Cut-Extrude13 3 (cut)
    with BuildSketch(Plane.YZ.offset(CUT_EXTRUDE13_START_3)):
        with Locations((-17, -406.839507899)):
            Rectangle(CUT_EXTRUDE13_3_OUTLINE_W, CUT_EXTRUDE13_3_OUTLINE_H)
    extrude(amount=CUT_EXTRUDE13_3_DEPTH, mode=Mode.SUBTRACT)

    # Sketch27 → Cut-Extrude14 (cut)
    with BuildSketch(Plane(origin=(0, -14, 0), x_dir=(1, 0, 0), z_dir=(0, 1, 0))):
        Polygon((194.71002043, 690.287715527), (222.448978629, 690.287715527), (216.079499529, 672.787715527), (222.448978629, 655.287715527), (194.71002043, 655.287715527), (201.079499529, 672.787715527), align=None)
        Polygon((99.479499529, 672.787715527), (93.11002043, 690.287715527), (120.848978629, 690.287715527), (114.479499529, 672.787715527), (120.848978629, 655.287715527), (93.11002043, 655.287715527), align=None)
        Polygon((201.079499529, 494.987715527), (194.71002043, 512.487715527), (222.448978629, 512.487715527), (216.079499529, 494.987715527), (222.448978629, 477.487715527), (194.71002043, 477.487715527), align=None)
        Polygon((353.479499529, 494.987715527), (347.11002043, 512.487715527), (374.848978629, 512.487715527), (368.479499529, 494.987715527), (374.848978629, 477.487715527), (347.11002043, 477.487715527), align=None)
        Polygon((505.879499529, 494.987715527), (499.51002043, 512.487715527), (527.248978629, 512.487715527), (520.879499529, 494.987715527), (527.248978629, 477.487715527), (499.51002043, 477.487715527), align=None)
        Polygon((271.322759289, 591.06039229), (271.322759289, 563.321434091), (253.822759289, 569.690913191), (236.322759289, 563.321434091), (236.322759289, 591.06039229), (253.822759289, 584.690913191), align=None)
        Polygon((253.822759289, 444.690913191), (271.322759289, 451.06039229), (271.322759289, 423.321434091), (253.822759289, 429.690913191), (236.322759289, 423.321434091), (236.322759289, 451.06039229), align=None)
        Polygon((430.693175696, 444.690913191), (448.193175696, 451.06039229), (448.193175696, 423.321434091), (430.693175696, 429.690913191), (413.193175696, 423.321434091), (413.193175696, 451.06039229), align=None)
        Polygon((430.693175696, 584.690913191), (448.193175696, 591.06039229), (448.193175696, 563.321434091), (430.693175696, 569.690913191), (413.193175696, 563.321434091), (413.193175696, 591.06039229), align=None)
        Polygon((574.122659289, 412.817458901), (574.122659289, 385.078500701), (556.622659289, 391.447979801), (539.122659289, 385.078500701), (539.122659289, 412.817458901), (556.622659289, 406.447979801), align=None)
    extrude(amount=-CUT_EXTRUDE14_DEPTH, mode=Mode.SUBTRACT)


solid = part.part
